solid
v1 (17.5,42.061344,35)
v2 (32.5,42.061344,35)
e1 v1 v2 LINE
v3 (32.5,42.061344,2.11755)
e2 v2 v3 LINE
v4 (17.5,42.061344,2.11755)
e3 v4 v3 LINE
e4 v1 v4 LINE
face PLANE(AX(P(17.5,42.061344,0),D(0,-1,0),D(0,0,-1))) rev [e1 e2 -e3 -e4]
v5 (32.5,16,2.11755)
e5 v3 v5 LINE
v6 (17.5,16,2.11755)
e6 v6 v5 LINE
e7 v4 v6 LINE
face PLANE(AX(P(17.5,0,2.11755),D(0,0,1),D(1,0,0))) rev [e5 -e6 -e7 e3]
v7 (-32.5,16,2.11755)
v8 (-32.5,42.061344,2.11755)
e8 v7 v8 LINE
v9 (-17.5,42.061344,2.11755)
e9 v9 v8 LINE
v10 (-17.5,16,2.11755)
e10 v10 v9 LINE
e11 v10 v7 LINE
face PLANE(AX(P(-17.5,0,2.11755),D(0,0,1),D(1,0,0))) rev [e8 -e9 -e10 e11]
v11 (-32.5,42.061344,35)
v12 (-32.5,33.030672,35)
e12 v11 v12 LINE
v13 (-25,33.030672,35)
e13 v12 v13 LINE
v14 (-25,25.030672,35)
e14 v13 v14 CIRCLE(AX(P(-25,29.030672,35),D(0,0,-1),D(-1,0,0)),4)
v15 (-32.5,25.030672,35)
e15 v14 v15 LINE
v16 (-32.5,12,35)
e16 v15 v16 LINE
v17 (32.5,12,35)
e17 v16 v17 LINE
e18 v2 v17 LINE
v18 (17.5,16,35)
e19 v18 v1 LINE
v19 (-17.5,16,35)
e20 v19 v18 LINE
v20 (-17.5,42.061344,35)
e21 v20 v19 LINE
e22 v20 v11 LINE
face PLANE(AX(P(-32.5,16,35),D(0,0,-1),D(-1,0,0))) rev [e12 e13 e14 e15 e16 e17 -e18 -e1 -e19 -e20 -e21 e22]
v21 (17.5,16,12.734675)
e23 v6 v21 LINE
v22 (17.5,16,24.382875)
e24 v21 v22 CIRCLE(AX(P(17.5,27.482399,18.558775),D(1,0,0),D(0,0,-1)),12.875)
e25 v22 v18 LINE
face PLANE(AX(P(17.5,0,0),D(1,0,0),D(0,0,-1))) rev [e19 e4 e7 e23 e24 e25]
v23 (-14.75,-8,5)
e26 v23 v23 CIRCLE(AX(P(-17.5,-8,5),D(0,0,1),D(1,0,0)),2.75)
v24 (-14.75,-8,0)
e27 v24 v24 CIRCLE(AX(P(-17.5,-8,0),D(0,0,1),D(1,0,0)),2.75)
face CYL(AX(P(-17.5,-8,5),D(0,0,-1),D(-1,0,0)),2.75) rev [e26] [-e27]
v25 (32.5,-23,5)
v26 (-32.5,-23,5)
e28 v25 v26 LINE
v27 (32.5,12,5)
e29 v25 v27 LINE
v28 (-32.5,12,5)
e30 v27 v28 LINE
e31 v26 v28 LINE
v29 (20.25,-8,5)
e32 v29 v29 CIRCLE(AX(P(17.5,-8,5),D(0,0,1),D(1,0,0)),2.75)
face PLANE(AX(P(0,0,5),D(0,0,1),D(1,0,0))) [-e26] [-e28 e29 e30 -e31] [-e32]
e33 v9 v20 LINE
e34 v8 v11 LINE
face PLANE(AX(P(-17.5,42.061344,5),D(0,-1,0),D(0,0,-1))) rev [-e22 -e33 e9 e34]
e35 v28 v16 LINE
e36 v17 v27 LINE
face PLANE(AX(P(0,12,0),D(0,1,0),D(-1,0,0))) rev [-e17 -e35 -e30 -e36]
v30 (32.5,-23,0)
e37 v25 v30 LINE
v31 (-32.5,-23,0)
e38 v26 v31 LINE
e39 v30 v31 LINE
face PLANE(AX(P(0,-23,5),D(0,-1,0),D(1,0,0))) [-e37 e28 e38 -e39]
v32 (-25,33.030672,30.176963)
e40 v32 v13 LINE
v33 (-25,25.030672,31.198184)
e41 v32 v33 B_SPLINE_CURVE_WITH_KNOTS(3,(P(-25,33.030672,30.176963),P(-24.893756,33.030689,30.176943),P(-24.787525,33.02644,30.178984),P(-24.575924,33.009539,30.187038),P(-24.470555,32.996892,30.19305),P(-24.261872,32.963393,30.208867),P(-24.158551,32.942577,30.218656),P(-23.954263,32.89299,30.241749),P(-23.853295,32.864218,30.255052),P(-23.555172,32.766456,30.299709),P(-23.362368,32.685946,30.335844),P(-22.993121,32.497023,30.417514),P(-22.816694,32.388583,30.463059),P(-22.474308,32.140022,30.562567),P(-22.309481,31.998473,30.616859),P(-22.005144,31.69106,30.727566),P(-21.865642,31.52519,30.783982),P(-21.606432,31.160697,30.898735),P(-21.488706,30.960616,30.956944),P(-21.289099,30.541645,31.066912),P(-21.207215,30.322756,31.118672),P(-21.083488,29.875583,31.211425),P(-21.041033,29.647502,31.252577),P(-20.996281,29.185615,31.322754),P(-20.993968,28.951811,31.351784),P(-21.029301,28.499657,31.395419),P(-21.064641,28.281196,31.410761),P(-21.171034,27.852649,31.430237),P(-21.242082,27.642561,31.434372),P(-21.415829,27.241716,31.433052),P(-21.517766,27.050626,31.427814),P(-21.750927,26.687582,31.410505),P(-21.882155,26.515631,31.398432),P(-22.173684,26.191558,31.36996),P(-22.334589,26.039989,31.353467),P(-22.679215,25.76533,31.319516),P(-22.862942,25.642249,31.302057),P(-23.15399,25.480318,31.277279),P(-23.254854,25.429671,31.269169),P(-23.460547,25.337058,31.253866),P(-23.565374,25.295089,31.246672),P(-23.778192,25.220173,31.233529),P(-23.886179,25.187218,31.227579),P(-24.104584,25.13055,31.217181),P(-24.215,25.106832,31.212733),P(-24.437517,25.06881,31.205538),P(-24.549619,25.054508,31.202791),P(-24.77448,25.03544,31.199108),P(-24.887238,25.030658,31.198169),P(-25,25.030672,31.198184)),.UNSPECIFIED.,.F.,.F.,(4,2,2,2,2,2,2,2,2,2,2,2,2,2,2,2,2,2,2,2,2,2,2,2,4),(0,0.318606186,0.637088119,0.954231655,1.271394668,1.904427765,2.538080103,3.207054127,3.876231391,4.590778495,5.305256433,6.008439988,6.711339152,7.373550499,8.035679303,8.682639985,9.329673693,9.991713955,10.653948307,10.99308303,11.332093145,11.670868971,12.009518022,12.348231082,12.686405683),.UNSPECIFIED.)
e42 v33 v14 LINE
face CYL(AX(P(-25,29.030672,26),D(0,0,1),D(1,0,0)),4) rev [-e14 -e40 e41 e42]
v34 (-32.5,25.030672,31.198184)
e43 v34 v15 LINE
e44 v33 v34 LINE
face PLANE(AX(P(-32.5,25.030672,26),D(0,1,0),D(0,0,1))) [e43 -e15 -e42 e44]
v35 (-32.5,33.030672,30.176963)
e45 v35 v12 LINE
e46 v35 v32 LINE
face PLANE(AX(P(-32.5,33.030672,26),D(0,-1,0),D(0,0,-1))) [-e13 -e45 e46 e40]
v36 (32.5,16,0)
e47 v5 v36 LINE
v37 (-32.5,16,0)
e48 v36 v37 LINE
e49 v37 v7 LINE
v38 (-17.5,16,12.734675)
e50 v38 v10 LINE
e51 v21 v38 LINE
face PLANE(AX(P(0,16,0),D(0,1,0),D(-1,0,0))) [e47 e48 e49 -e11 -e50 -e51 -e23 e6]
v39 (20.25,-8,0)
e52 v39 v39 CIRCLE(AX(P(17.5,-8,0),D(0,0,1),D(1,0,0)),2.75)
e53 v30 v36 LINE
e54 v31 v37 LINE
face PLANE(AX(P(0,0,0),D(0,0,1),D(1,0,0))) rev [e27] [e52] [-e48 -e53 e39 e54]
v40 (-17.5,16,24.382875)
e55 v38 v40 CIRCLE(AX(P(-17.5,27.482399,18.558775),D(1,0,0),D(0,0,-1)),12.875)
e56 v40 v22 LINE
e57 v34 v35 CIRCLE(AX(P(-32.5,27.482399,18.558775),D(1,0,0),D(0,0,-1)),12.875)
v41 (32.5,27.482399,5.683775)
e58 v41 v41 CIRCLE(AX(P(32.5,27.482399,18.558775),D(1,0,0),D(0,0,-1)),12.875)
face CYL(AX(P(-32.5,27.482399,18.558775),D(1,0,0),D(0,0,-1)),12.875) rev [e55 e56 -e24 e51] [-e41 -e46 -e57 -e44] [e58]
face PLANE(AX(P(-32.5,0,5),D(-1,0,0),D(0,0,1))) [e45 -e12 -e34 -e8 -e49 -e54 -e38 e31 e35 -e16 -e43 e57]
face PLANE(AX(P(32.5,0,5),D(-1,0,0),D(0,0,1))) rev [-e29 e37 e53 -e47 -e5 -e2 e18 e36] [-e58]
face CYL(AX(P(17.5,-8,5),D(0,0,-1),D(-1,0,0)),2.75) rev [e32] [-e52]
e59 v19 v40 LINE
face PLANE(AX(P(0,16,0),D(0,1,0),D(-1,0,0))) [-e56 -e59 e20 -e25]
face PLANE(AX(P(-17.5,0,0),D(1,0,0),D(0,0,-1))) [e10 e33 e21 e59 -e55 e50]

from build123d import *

# Parameters (mm, degrees)
CROQUIS2_W              = 65
CROQUIS2_H              = 35
CROQUIS2_R              = 2.75
SALIENTE_EXTRUIR1_DEPTH = 5
CROQUIS3_W              = 65
CROQUIS3_H              = 35
SALIENTE_EXTRUIR2_DEPTH = 4
SALIENTE_EXTRUIR3_DEPTH = 15
SALIENTE_EXTRUIR4_START = -65
SALIENTE_EXTRUIR4_DEPTH = 15
CORTAR_EXTRUIR1_DEPTH   = 85.965620518
CORTAR_EXTRUIR2_START   = -32.882450487
CORTAR_EXTRUIR2_DEPTH   = 4.823037372


# Read off the part's stored shape, not the designer's step: Cortar-Extruir2
with BuildPart() as part:
    # Croquis2 → Saliente-Extruir1 (new body)
    with BuildSketch(Plane.XY):
        with Locations((0, -5.5)):
            Rectangle(CROQUIS2_W, CROQUIS2_H)
        with Locations((17.5, -8)):
            Circle(CROQUIS2_R, mode=Mode.SUBTRACT)
        with Locations((-17.5, -8)):
            Circle(CROQUIS2_R, mode=Mode.SUBTRACT)
    extrude(amount=SALIENTE_EXTRUIR1_DEPTH)

    # Croquis3 → Saliente-Extruir2 (add)
    with BuildSketch(Plane(origin=(0, 12, 0), x_dir=(1, 0, 0), z_dir=(0, 1, 0))):
        with Locations((0, -17.5)):
            Rectangle(CROQUIS3_W, CROQUIS3_H)
    extrude(amount=SALIENTE_EXTRUIR2_DEPTH)

    # Croquis4 → Saliente-Extruir3 (add)
    with BuildSketch(Plane(origin=(32.5, 0, 0), x_dir=(0, 0, -1), z_dir=(1, 0, 0))):
        with BuildLine():
            Line((-35, 42.06134413), (-35, 16))
            Line((-35, 16), (-24.382874813, 16))
            ThreePointArc((-24.382874813, 16), (-25.295997358, 38.453973796), (-5.683774756, 27.482398858))
            ThreePointArc((-5.683774756, 27.482398858), (-7.587199819, 20.745176256), (-12.7346747, 16))
            Line((-12.7346747, 16), (-2.117549513, 16))
            Line((-2.117549513, 16), (-2.117549513, 42.06134413))
            Line((-2.117549513, 42.06134413), (-35, 42.06134413))
        make_face()
        with BuildLine():
            Line((-12.7346747, 16), (-24.382874813, 16))
            ThreePointArc((-24.382874813, 16), (-18.558774756, 14.607398858), (-12.7346747, 16))
        make_face()
        with BuildLine():
            ThreePointArc((-5.683774756, 27.482398858), (-25.295997358, 38.453973796), (-24.382874813, 16))
            Line((-24.382874813, 16), (-12.7346747, 16))
            ThreePointArc((-12.7346747, 16), (-7.587199819, 20.745176256), (-5.683774756, 27.482398858))
        make_face()
    extrude(amount=-SALIENTE_EXTRUIR3_DEPTH)

    # Croquis4<6> → Saliente-Extruir4 (add)
    with BuildSketch(Plane(origin=(32.5, 0, 0), x_dir=(0, 0, -1), z_dir=(1, 0, 0)).offset(SALIENTE_EXTRUIR4_START)):
        with BuildLine():
            Line((-35, 42.06134413), (-35, 16))
            Line((-35, 16), (-24.382874813, 16))
            ThreePointArc((-24.382874813, 16), (-25.295997358, 38.453973796), (-5.683774756, 27.482398858))
            ThreePointArc((-5.683774756, 27.482398858), (-7.587199819, 20.745176256), (-12.7346747, 16))
            Line((-12.7346747, 16), (-2.117549513, 16))
            Line((-2.117549513, 16), (-2.117549513, 42.06134413))
            Line((-2.117549513, 42.06134413), (-35, 42.06134413))
        make_face()
        with BuildLine():
            Line((-12.7346747, 16), (-24.382874813, 16))
            ThreePointArc((-24.382874813, 16), (-18.558774756, 14.607398858), (-12.7346747, 16))
        make_face()
        with BuildLine():
            ThreePointArc((-5.683774756, 27.482398858), (-25.295997358, 38.453973796), (-24.382874813, 16))
            Line((-24.382874813, 16), (-12.7346747, 16))
            ThreePointArc((-12.7346747, 16), (-7.587199819, 20.745176256), (-5.683774756, 27.482398858))
        make_face()
    extrude(amount=SALIENTE_EXTRUIR4_DEPTH)

    # Croquis4<4> → Cortar-Extruir1 (cut, through all)
    with BuildSketch(Plane(origin=(32.5, 0, 0), x_dir=(0, 0, -1), z_dir=(1, 0, 0))):
        with BuildLine():
            Line((-12.7346747, 16), (-24.382874813, 16))
            ThreePointArc((-24.382874813, 16), (-18.558774756, 14.607398858), (-12.7346747, 16))
        make_face()
        with BuildLine():
            ThreePointArc((-5.683774756, 27.482398858), (-25.295997358, 38.453973796), (-24.382874813, 16))
            Line((-24.382874813, 16), (-12.7346747, 16))
            ThreePointArc((-12.7346747, 16), (-7.587199819, 20.745176256), (-5.683774756, 27.482398858))
        make_face()
    extrude(amount=-CORTAR_EXTRUIR1_DEPTH, mode=Mode.SUBTRACT)

    # Cortar-Extruir2 outline → Cortar-Extruir2 (cut)
    with BuildSketch(Plane(origin=(0, 0, 2.117549513), x_dir=(-1, 0, 0), z_dir=(0, 0, -1)).offset(CORTAR_EXTRUIR2_START)):
        with BuildLine():
            Line((32.5, 33.030672065), (25, 33.030672065))
            ThreePointArc((25, 33.030672065), (21, 29.030672065), (25, 25.030672065))
            Line((25, 25.030672065), (32.5, 25.030672065))
            Line((32.5, 25.030672065), (32.5, 33.030672065))
        make_face()
    extrude(amount=CORTAR_EXTRUIR2_DEPTH, mode=Mode.SUBTRACT)


solid = part.part
